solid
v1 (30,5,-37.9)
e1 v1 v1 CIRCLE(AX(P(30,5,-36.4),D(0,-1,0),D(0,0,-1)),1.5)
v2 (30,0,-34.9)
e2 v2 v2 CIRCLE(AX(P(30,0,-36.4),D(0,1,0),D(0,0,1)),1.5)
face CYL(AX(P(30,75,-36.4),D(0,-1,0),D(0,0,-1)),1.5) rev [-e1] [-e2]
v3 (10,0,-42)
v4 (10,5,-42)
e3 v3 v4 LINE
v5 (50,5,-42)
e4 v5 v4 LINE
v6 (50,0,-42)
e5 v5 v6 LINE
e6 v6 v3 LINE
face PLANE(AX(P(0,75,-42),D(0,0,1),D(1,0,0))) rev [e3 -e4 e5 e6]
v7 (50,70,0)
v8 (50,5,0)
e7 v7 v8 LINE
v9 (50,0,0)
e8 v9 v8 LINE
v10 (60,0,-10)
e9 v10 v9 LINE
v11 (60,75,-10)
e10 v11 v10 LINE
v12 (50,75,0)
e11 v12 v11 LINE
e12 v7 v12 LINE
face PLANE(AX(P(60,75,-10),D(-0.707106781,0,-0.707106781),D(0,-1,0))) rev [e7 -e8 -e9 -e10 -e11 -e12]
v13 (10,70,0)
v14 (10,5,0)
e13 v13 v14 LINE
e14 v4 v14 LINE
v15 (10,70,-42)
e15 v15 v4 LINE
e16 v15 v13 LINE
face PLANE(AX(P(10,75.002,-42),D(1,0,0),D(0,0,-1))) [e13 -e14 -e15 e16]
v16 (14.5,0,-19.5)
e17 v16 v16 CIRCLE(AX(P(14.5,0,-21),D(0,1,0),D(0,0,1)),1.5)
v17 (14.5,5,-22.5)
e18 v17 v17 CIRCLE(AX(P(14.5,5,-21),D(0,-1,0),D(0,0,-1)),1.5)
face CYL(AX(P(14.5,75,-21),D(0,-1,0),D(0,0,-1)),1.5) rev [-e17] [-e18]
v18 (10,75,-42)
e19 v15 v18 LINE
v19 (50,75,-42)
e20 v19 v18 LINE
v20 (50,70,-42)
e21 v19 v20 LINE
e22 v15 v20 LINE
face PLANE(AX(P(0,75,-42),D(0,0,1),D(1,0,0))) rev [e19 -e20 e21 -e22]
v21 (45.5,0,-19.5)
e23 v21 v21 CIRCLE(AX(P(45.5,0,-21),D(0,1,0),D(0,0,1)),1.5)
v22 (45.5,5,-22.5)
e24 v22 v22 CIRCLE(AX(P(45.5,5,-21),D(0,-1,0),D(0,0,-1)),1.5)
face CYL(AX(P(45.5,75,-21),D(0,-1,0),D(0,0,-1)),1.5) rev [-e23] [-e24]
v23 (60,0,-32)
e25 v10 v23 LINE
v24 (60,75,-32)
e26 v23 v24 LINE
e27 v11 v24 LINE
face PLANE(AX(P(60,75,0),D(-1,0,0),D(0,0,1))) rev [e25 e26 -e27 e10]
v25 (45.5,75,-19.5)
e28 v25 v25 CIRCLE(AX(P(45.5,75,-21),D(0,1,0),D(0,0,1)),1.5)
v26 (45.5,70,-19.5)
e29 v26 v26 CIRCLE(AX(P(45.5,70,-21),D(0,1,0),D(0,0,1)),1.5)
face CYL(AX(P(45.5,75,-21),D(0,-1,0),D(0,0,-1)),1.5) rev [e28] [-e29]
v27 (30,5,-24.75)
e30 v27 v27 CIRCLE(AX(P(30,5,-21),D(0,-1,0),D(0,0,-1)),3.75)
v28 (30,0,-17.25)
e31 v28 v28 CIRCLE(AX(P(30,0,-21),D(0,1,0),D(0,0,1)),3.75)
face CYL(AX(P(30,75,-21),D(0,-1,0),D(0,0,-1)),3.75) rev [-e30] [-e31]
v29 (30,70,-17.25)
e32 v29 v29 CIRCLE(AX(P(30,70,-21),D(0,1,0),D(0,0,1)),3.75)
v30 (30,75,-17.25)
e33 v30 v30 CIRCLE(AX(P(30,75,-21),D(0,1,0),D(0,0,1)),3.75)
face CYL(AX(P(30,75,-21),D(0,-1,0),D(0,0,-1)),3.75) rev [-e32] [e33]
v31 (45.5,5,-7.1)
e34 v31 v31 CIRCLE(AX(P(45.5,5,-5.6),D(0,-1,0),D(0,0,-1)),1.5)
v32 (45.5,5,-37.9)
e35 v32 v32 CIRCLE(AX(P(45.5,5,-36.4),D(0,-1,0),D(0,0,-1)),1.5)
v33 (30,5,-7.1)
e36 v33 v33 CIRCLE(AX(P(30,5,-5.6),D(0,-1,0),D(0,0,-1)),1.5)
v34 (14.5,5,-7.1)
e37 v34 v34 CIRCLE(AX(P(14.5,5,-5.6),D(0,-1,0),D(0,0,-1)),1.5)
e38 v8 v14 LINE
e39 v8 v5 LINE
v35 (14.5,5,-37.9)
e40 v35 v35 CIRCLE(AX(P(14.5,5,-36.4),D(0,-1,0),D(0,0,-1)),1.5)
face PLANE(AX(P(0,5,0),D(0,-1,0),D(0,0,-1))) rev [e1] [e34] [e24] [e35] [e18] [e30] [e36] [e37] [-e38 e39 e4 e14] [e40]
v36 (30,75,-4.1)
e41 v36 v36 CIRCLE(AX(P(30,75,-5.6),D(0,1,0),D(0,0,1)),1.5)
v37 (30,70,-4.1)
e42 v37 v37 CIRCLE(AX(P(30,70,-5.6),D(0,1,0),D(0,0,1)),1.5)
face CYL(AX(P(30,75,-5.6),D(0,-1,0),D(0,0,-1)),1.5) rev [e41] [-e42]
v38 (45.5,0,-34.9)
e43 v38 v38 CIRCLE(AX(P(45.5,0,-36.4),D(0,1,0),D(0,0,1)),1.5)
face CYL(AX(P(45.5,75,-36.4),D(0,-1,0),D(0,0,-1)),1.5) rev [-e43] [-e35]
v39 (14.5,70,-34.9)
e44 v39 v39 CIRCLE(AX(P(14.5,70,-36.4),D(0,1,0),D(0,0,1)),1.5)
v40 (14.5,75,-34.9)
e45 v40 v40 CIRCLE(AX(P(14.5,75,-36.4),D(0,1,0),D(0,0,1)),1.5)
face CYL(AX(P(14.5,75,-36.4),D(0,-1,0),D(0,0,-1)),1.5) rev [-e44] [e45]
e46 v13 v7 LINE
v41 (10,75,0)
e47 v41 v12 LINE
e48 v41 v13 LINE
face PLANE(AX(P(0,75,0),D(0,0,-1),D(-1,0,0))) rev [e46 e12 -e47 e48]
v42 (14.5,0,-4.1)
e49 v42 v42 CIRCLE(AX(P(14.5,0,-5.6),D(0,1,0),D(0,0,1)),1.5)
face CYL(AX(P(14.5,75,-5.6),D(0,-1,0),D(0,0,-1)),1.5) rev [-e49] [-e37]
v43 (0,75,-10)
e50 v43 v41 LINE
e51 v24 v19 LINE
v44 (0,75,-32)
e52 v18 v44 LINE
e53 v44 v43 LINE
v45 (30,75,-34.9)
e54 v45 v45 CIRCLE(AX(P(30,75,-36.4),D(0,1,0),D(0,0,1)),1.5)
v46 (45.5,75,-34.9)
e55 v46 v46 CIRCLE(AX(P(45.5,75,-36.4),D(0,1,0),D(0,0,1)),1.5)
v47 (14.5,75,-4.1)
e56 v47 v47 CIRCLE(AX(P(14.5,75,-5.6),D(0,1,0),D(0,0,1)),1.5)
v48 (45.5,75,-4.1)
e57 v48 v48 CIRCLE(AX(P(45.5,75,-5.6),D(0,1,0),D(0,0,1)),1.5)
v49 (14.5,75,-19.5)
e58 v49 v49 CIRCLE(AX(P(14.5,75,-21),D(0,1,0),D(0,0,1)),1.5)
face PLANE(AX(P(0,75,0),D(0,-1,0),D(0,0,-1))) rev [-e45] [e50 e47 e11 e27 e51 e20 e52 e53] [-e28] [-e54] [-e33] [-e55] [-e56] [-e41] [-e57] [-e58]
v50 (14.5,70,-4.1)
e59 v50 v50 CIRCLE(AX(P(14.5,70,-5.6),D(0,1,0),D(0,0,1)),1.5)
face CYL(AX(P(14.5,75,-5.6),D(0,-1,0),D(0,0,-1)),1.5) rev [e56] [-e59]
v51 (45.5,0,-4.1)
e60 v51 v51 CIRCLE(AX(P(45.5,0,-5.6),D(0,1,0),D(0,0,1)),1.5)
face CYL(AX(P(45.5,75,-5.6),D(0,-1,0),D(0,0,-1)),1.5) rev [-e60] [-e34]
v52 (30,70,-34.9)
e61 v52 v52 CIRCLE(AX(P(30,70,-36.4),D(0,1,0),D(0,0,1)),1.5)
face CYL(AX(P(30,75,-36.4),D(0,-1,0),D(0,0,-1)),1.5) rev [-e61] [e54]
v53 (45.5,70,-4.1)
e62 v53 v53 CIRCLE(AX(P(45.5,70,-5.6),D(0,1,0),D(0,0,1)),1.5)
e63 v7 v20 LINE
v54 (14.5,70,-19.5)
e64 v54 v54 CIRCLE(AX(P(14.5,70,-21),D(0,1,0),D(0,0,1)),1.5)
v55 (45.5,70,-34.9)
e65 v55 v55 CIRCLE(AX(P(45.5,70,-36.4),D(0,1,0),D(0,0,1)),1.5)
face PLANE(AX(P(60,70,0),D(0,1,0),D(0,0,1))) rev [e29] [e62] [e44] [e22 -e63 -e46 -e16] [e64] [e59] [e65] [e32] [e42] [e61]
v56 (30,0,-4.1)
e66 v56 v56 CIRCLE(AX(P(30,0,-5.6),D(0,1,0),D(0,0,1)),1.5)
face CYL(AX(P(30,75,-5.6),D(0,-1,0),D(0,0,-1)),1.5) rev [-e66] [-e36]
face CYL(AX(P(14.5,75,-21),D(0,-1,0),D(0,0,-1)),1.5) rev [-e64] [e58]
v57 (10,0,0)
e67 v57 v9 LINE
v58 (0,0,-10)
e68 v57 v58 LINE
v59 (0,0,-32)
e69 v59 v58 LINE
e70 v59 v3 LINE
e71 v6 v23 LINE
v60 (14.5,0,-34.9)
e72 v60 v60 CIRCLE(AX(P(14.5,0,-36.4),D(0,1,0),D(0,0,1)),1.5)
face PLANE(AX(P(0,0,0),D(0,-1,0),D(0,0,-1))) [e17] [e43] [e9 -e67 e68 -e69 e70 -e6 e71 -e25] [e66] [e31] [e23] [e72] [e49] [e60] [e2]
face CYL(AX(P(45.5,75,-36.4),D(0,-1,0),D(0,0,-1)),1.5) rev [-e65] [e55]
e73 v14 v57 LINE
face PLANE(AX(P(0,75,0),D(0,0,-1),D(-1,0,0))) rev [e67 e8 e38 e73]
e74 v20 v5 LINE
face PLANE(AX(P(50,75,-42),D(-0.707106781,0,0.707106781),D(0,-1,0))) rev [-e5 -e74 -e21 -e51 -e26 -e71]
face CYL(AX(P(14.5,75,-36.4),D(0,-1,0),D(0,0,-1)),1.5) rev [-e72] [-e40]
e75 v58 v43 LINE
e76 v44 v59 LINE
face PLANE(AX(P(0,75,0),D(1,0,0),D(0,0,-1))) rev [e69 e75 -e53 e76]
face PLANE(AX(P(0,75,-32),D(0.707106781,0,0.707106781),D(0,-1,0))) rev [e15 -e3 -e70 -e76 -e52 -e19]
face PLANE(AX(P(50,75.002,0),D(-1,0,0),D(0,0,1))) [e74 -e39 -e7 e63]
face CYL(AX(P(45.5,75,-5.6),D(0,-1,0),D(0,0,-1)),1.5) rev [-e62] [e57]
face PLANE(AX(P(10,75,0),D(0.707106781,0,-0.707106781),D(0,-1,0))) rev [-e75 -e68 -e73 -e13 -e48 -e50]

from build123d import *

# Parameters (mm, degrees)
SKETCH3_W           = 60
SKETCH3_H           = 42
SKETCH3_R           = 3.75
SKETCH3_R_2         = 1.5
BOSS_EXTRUDE1_DEPTH = 75
SKETCH4_W           = 60
SKETCH4_H           = 65
CUT_EXTRUDE1_DEPTH  = 105.828431258
BOSS_EXTRUDE2_REACH = 103.311
SKETCH5_W           = 10
SKETCH5_H           = 42
CHAMFER2_SIZE       = 10


with BuildPart() as part:
    # Sketch3 → Boss-Extrude1 (new body)
    with BuildSketch(Plane(origin=(0, 0, 0), x_dir=(1, 0, 0), z_dir=(0, 1, 0))):
        with Locations((30, 21)):
            Rectangle(SKETCH3_W, SKETCH3_H)
        with Locations(Location((30, 21, 0), (0, 0, 270))):
            Circle(SKETCH3_R, mode=Mode.SUBTRACT)
        with Locations(Location((14.5, 36.4, 0), (0, 0, 270))):
            Circle(SKETCH3_R_2, mode=Mode.SUBTRACT)
        with Locations(Location((45.5, 36.4, 0), (0, 0, 270))):
            Circle(SKETCH3_R_2, mode=Mode.SUBTRACT)
        with Locations(Location((45.5, 5.6, 0), (0, 0, 270))):
            Circle(SKETCH3_R_2, mode=Mode.SUBTRACT)
        with Locations(Location((14.5, 5.6, 0), (0, 0, 270))):
            Circle(SKETCH3_R_2, mode=Mode.SUBTRACT)
        with Locations(Location((30, 36.4, 0), (0, 0, 270))):
            Circle(SKETCH3_R_2, mode=Mode.SUBTRACT)
        with Locations(Location((45.5, 21, 0), (0, 0, 270))):
            Circle(SKETCH3_R_2, mode=Mode.SUBTRACT)
        with Locations(Location((30, 5.6, 0), (0, 0, 270))):
            Circle(SKETCH3_R_2, mode=Mode.SUBTRACT)
        with Locations(Location((14.5, 21, 0), (0, 0, 270))):
            Circle(SKETCH3_R_2, mode=Mode.SUBTRACT)
    extrude(amount=BOSS_EXTRUDE1_DEPTH)

    # Sketch4 → Cut-Extrude1 (cut, through all)
    with BuildSketch(Plane(origin=(0, 0, -42), x_dir=(-1, 0, 0), z_dir=(0, 0, -1))):
        with Locations((-30, 37.5)):
            Rectangle(SKETCH4_W, SKETCH4_H)
    extrude(amount=-CUT_EXTRUDE1_DEPTH, mode=Mode.SUBTRACT)


with BuildPart() as cut_extrude1_piece_1:
    # of the separate pieces the step leaves, piece 1, a body of its own (cut_extrude1_pieces)
    add(part.part.solids().sort_by_distance((60, 70, 0))[0])

    # Sketch5 → Boss-Extrude2 (add, up to next)
    with BuildSketch(Plane(origin=(0, 5, 0), x_dir=(1, 0, 0), z_dir=(0, 1, 0)), mode=Mode.PRIVATE) as boss_extrude2_sk1:
        with Locations((5, 21)):
            Rectangle(SKETCH5_W, SKETCH5_H)
    boss_extrude2_tool1 = extrude(boss_extrude2_sk1.sketch, amount=BOSS_EXTRUDE2_REACH, mode=Mode.PRIVATE) - cut_extrude1_piece_1.part
    # Sketch5 → Boss-Extrude2 (add, up to next)
    with BuildSketch(Plane(origin=(0, 5, 0), x_dir=(1, 0, 0), z_dir=(0, 1, 0)), mode=Mode.PRIVATE) as boss_extrude2_sk2:
        with Locations((55, 21)):
            Rectangle(SKETCH5_W, SKETCH5_H)
    boss_extrude2_tool2 = extrude(boss_extrude2_sk2.sketch, amount=BOSS_EXTRUDE2_REACH, mode=Mode.PRIVATE) - cut_extrude1_piece_1.part


with BuildPart() as cut_extrude1_piece_2:
    # of the separate pieces the step leaves, piece 2, a body of its own (cut_extrude1_pieces)
    add(part.part.solids().sort_by_distance((0, 0, 0))[0])


with BuildPart() as cut_extrude1_piece_1_1:
    add(cut_extrude1_piece_1.part)

    add(cut_extrude1_piece_2.part)  # Boss-Extrude2 merges Cut-Extrude1 piece 2
    add(boss_extrude2_tool1.solids().sort_by_distance((5, 5, -21))[0])
    add(boss_extrude2_tool2.solids().sort_by_distance((55, 5, -21))[0])

    # Chamfer2
    chamfer2_edges = [cut_extrude1_piece_1_1.edges().sort_by_distance(p)[0] for p in [
        (0, 37.5, -42),
        (0, 37.5, 0),
        (60, 37.5, 0),
        (60, 37.5, -42),
    ]]
    chamfer(chamfer2_edges, length=CHAMFER2_SIZE - 0.0001)  # a hair under: the kernel refuses the full size


solid = cut_extrude1_piece_1_1.part
